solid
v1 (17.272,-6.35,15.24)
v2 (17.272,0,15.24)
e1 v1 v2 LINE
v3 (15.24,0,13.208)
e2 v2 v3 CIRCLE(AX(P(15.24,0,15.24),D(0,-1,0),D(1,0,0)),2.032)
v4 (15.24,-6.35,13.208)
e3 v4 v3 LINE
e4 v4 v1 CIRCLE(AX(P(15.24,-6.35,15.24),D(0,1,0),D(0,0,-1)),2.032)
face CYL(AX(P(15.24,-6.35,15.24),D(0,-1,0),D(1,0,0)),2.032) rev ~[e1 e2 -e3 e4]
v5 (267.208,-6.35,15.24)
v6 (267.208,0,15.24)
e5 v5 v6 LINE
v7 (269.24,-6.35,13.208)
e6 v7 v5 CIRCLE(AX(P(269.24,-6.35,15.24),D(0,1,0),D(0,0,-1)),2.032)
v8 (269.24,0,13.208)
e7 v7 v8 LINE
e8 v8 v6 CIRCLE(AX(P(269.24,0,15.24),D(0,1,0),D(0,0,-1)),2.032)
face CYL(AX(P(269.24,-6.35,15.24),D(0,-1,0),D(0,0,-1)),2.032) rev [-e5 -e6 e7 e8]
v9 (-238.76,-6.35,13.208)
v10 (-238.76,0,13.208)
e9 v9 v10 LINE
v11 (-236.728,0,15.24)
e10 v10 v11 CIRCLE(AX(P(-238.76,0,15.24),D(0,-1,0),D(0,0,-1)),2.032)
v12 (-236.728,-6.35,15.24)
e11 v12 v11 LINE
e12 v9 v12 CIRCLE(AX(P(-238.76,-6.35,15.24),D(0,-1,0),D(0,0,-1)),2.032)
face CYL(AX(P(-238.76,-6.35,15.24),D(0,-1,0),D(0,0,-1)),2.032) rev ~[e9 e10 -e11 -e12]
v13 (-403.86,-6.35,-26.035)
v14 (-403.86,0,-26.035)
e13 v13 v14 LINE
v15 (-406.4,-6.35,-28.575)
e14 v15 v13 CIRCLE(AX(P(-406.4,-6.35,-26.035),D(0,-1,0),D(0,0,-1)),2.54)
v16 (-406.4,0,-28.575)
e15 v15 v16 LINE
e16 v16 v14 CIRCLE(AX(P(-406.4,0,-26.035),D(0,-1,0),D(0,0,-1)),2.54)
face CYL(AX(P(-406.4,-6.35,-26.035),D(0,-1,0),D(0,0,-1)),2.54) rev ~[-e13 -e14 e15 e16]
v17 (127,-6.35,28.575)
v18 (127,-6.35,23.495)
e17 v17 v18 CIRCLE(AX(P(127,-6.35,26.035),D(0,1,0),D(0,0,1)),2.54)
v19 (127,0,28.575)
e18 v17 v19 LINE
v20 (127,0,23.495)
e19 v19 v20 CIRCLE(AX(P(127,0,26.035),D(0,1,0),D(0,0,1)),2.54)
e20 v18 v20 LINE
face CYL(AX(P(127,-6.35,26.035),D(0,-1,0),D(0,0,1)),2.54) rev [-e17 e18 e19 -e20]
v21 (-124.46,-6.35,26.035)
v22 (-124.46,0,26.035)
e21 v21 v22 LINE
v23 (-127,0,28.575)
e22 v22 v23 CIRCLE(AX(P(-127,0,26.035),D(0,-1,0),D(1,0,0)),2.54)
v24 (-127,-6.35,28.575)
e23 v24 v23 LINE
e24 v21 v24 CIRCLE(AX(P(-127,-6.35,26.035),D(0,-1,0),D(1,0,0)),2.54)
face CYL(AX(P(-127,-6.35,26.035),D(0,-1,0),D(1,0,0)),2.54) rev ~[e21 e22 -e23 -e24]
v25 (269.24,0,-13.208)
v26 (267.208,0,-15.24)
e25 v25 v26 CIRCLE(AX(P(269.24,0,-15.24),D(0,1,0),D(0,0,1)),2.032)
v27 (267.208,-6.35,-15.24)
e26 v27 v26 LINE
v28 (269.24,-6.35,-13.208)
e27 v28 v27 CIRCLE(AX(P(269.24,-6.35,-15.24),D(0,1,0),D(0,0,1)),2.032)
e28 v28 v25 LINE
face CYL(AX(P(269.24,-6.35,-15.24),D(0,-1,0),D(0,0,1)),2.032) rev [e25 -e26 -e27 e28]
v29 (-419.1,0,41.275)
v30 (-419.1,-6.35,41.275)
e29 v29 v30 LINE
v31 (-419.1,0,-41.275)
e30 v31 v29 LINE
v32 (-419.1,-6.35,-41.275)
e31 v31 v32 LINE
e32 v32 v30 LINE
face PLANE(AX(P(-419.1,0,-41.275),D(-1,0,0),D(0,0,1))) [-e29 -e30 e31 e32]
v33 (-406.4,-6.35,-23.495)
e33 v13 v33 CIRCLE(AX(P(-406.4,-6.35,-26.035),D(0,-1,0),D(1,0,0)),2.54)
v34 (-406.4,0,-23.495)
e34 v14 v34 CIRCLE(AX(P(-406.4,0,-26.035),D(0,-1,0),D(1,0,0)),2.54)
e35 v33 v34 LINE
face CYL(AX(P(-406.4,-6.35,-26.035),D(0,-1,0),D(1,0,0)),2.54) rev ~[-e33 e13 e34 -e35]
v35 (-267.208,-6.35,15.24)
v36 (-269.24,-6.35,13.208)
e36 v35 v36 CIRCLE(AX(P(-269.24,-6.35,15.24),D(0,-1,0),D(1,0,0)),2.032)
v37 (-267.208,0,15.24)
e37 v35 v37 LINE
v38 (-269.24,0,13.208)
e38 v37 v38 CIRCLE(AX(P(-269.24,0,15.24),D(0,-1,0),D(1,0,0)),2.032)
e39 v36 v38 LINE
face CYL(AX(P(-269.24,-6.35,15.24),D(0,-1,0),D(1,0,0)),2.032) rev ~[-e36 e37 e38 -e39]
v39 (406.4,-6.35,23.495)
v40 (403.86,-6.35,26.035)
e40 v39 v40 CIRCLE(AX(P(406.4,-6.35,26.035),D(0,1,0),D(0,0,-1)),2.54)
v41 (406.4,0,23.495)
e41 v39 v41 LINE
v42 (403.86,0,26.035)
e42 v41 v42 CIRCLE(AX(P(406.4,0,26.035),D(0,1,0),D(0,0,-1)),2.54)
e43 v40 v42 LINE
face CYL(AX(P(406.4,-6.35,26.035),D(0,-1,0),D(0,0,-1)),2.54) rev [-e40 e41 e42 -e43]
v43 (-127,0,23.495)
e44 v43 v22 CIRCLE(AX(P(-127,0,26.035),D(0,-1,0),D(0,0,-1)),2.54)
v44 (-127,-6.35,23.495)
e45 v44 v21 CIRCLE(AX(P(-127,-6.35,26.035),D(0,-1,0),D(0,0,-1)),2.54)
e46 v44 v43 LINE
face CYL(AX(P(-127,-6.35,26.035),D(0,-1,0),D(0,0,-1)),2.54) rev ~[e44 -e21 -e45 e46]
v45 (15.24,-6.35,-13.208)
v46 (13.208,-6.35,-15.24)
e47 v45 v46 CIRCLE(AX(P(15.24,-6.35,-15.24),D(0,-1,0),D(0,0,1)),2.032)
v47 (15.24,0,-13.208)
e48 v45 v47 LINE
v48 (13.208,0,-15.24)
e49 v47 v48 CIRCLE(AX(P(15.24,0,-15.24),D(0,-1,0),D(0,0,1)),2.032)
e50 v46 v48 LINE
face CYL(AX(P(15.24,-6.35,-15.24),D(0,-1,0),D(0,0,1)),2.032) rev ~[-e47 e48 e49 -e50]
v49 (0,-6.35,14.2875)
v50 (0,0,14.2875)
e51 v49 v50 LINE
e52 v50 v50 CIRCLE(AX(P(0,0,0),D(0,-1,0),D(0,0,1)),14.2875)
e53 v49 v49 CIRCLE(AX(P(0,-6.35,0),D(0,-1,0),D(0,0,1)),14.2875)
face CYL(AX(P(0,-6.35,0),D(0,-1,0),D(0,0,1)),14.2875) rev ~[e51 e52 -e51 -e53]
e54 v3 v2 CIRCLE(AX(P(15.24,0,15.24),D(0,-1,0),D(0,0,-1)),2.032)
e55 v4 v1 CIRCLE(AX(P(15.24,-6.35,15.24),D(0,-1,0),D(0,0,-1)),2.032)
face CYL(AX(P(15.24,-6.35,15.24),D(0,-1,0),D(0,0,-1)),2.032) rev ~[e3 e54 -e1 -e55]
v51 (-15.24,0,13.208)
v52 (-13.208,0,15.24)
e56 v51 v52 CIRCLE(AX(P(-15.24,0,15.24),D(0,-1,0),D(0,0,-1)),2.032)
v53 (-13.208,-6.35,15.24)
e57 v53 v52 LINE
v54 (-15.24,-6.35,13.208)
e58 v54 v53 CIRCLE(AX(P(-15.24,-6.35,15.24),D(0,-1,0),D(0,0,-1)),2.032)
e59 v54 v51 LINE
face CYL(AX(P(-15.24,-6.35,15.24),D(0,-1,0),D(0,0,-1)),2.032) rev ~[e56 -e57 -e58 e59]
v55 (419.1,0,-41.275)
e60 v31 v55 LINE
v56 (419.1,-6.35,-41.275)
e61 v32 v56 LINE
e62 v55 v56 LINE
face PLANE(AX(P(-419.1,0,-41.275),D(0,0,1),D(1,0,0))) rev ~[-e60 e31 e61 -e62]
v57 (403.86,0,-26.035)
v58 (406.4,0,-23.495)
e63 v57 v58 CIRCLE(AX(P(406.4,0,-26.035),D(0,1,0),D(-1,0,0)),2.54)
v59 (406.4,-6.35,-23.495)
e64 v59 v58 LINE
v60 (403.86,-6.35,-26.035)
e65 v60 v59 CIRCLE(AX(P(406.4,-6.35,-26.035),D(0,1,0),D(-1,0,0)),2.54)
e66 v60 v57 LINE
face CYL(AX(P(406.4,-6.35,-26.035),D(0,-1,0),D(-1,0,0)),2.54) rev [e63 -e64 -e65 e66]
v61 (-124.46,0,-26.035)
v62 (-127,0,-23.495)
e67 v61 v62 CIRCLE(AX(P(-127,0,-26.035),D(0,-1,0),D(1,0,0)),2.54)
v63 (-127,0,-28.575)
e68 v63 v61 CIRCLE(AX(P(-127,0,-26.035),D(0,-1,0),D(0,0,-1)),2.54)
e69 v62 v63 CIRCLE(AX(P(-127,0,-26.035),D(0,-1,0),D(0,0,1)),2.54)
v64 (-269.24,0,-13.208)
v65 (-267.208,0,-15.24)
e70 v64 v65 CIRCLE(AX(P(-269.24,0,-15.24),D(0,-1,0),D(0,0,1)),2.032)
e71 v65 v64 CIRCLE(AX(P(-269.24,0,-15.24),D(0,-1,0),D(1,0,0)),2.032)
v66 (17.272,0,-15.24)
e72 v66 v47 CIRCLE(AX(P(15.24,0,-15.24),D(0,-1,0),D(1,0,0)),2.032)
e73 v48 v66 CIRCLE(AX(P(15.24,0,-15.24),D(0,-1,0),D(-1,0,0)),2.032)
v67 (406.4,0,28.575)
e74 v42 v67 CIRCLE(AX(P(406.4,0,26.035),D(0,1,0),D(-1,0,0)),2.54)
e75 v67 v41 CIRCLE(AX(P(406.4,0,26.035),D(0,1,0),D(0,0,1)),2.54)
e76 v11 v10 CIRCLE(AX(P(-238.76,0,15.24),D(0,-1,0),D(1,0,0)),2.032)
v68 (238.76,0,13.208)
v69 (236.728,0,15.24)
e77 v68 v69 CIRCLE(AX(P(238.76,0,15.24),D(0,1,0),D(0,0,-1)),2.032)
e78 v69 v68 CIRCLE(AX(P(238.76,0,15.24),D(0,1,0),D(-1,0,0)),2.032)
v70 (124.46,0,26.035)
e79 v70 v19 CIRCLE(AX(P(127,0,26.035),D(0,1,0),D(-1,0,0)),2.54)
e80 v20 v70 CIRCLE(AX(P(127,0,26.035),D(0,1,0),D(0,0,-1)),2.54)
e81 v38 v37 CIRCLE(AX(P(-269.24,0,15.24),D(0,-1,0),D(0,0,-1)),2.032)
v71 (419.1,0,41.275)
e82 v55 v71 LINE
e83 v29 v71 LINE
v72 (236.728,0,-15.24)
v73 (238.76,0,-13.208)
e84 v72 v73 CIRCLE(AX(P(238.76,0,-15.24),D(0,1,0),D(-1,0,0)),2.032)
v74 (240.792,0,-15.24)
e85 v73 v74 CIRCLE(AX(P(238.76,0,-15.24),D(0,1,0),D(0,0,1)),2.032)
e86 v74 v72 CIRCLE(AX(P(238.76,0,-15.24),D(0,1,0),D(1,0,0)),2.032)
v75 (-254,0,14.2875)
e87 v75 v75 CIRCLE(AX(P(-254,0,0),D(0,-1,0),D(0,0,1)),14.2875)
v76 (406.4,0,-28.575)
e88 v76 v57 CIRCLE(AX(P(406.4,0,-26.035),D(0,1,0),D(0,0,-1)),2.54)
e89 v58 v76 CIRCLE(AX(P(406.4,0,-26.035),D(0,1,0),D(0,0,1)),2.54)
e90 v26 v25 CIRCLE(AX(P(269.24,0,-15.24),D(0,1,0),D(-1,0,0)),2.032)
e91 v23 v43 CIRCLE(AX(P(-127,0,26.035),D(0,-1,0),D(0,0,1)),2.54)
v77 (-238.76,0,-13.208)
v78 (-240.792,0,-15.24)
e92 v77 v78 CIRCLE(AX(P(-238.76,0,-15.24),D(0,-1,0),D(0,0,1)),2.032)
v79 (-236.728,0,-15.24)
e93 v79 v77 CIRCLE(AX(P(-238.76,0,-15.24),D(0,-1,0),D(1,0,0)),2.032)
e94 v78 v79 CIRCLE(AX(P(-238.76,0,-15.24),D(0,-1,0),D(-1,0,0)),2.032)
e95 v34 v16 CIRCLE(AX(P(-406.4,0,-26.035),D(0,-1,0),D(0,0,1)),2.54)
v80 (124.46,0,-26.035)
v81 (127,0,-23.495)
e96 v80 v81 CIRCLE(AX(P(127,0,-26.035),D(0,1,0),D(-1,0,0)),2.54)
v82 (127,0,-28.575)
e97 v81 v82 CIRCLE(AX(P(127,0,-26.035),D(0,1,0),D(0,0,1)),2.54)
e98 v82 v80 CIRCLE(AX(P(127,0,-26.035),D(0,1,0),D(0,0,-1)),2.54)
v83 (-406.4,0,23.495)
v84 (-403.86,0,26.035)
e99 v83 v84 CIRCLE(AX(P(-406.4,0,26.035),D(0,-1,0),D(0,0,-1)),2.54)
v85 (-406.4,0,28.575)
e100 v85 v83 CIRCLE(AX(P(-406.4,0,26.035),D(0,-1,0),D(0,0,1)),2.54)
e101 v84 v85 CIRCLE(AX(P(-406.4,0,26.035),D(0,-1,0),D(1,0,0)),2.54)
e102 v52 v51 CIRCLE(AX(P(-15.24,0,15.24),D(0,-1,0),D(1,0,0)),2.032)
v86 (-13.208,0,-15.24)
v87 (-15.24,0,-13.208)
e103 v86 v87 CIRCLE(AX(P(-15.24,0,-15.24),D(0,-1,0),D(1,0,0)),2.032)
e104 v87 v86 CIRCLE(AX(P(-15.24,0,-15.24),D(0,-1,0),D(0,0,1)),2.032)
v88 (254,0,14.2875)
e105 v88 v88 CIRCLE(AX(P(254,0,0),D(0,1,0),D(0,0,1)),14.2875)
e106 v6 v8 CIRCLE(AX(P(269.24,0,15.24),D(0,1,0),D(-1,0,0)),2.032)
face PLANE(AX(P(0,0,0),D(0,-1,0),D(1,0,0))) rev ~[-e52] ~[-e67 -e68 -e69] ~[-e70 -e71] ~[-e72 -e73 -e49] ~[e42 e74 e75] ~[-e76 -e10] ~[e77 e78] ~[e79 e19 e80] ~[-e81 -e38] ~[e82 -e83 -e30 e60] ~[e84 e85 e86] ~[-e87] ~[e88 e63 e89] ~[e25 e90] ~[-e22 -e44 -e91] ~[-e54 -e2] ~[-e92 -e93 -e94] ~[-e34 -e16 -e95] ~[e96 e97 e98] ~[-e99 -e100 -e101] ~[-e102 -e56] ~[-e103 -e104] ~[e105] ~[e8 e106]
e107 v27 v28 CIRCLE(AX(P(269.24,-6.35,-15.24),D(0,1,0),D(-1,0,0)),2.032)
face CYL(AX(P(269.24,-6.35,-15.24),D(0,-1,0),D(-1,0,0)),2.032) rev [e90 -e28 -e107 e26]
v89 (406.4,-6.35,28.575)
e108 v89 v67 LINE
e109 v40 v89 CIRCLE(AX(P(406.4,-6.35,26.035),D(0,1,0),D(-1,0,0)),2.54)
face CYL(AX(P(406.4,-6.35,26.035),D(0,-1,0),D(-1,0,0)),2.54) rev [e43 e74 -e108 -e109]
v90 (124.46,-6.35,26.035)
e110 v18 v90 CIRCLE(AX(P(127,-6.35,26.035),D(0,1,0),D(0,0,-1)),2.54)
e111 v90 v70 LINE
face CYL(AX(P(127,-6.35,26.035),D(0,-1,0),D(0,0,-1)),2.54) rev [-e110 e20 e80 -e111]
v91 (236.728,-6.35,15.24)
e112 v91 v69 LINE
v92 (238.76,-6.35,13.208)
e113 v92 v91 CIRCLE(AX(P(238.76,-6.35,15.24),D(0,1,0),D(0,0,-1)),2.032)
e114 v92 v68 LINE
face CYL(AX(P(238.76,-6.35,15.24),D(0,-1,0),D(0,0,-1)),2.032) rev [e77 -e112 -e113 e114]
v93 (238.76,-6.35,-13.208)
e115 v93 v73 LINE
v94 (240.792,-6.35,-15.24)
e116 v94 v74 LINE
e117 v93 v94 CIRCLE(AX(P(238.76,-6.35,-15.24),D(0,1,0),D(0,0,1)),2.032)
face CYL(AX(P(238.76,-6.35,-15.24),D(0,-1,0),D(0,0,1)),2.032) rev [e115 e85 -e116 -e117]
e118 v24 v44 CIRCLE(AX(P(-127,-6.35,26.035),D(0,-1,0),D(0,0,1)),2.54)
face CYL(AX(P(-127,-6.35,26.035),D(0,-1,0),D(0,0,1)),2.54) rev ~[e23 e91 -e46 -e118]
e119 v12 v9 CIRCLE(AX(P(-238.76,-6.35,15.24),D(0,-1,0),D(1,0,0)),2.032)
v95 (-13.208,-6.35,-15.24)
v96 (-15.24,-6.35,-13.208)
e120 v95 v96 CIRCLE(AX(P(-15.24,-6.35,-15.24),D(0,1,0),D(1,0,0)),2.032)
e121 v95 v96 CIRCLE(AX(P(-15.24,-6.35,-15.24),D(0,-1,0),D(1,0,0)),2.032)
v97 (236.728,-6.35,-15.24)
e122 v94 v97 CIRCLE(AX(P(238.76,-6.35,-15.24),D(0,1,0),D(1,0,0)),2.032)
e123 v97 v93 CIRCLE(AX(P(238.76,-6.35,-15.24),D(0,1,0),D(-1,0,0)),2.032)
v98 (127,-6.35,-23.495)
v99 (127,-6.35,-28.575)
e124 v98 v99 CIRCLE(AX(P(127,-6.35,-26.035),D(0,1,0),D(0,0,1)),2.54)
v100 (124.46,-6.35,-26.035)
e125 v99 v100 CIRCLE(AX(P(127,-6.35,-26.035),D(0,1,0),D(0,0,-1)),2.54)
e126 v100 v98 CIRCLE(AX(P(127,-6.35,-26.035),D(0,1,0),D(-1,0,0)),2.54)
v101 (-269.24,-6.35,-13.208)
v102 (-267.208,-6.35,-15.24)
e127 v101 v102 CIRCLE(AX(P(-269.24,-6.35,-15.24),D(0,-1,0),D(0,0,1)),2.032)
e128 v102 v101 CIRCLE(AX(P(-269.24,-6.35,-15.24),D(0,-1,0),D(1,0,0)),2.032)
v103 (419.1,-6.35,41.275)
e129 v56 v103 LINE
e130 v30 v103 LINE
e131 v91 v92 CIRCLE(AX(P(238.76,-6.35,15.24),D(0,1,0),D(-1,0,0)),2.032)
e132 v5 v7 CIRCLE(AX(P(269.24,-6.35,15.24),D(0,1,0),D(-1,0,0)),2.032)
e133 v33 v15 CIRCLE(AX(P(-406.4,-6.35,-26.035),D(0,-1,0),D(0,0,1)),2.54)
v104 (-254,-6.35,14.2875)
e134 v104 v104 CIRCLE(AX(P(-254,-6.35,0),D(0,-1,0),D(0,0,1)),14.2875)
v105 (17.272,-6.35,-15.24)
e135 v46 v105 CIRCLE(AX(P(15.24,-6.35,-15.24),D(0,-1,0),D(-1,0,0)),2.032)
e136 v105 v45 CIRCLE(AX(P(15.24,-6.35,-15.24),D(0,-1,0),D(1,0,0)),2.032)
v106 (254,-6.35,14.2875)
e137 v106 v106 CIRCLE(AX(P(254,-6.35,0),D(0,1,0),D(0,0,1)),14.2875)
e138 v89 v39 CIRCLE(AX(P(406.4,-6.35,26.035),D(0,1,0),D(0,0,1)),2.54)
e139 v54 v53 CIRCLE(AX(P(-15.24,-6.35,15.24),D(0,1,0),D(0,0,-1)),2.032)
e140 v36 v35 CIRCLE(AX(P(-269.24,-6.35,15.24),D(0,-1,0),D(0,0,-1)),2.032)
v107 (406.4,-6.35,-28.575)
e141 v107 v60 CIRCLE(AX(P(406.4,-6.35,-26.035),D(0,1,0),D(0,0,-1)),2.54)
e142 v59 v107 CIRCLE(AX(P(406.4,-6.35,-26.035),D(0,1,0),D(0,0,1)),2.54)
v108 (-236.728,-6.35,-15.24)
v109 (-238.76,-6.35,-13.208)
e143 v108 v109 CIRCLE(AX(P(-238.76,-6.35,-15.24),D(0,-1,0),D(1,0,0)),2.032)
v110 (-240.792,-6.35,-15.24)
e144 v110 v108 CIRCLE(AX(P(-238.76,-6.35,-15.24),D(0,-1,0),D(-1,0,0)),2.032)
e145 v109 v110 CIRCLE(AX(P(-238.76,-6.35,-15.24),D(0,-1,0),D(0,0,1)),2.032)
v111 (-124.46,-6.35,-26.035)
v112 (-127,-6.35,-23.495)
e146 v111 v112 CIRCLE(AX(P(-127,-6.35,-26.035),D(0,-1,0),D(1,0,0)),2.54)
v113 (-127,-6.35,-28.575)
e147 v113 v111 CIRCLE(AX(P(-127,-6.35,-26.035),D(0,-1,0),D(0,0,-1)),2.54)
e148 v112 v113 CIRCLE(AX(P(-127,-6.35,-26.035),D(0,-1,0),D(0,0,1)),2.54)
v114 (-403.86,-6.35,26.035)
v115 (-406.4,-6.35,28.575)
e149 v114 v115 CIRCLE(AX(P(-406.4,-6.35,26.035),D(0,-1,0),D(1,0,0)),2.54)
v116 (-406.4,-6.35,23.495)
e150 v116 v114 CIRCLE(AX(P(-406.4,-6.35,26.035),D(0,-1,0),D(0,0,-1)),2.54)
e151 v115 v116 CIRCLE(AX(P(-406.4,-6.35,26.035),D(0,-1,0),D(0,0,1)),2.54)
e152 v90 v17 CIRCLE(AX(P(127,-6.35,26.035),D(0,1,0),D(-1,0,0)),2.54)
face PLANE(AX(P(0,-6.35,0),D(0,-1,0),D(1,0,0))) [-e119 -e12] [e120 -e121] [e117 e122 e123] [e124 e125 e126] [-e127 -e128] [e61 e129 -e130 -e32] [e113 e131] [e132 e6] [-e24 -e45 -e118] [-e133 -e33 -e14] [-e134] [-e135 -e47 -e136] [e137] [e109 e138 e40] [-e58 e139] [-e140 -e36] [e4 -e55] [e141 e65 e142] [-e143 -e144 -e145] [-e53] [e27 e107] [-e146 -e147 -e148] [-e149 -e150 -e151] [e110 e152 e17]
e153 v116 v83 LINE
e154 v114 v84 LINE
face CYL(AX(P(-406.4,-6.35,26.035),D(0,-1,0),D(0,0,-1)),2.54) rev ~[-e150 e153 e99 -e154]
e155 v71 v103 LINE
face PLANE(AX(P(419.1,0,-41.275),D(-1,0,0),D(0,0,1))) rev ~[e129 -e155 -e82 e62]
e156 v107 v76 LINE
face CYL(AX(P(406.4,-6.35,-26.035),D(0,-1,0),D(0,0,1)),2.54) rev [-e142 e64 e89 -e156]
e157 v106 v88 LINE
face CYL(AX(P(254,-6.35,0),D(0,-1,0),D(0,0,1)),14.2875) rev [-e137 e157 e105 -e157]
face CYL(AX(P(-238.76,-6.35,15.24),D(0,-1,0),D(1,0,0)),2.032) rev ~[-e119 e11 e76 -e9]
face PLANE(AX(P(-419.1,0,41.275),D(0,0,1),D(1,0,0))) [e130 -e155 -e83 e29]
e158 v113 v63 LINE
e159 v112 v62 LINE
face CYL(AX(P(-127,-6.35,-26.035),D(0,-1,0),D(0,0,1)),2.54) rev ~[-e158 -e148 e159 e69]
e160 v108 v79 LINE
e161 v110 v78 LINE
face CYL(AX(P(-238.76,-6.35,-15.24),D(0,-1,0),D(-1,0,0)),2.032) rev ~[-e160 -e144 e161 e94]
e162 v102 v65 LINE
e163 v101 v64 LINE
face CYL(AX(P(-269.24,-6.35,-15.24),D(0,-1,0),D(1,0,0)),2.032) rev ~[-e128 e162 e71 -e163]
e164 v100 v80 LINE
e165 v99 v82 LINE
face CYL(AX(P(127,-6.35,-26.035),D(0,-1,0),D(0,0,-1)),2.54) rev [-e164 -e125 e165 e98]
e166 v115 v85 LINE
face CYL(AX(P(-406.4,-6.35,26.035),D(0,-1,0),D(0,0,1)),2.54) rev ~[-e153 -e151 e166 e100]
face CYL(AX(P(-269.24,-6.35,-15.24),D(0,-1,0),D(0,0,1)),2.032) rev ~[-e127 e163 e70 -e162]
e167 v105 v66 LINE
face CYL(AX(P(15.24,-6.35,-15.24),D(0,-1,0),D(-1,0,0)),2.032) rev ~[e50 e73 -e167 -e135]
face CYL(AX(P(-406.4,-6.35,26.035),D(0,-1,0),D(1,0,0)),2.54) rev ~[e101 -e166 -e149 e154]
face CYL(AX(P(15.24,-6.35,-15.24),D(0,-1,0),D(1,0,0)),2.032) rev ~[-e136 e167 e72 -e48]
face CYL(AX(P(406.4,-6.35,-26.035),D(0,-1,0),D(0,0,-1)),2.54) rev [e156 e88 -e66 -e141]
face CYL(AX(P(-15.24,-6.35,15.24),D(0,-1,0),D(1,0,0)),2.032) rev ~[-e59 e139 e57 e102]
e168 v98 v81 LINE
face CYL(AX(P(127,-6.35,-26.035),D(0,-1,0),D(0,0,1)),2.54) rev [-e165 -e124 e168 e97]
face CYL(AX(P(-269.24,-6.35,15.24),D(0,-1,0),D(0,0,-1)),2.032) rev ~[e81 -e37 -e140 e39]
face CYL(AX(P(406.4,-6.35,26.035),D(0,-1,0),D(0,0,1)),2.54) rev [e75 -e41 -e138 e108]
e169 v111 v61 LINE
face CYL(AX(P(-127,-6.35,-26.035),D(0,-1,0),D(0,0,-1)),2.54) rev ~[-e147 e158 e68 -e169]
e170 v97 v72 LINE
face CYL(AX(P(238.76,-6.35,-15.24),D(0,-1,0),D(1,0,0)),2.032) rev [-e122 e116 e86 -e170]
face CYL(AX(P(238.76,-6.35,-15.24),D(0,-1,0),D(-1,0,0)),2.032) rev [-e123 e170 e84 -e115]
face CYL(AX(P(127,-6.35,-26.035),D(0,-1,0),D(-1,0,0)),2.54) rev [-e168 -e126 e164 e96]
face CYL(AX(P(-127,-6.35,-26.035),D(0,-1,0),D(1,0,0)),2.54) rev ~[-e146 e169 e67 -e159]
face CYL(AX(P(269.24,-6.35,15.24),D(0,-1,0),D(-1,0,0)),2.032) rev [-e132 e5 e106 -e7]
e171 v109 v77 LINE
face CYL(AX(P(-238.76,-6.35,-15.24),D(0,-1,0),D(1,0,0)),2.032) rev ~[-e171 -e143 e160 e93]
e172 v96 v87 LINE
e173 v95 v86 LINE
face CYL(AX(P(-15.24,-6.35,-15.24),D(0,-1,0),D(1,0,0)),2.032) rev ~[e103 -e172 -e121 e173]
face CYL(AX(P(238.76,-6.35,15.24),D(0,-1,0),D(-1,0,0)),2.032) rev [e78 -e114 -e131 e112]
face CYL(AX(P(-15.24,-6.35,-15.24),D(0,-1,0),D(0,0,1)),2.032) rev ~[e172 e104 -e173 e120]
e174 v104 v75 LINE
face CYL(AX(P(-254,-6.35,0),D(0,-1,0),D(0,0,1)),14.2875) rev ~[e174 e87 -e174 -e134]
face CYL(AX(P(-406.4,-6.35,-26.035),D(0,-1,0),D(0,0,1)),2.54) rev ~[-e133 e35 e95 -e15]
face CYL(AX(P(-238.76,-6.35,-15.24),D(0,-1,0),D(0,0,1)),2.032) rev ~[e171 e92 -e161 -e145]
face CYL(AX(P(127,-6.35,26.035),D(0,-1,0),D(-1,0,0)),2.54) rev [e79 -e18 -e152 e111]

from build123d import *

# Parameters (mm, degrees)
F0_W     = 838.2
F0_H     = 82.55
F1_DEPTH = 6.35
F3_DEPTH = 6.35
F5_DEPTH = 6.35


# Not quite as in the source:
# - a pattern or mirror of a feature is missing from the dataset's text; its kind, count and spacing are read off the source's solid


with BuildPart() as f1:
    # F0 (on Front) → F1 (new body)
    with BuildSketch(Plane.XZ):
        Rectangle(F0_W, F0_H)
    extrude(amount=F1_DEPTH)

    # F2 (on face) → F3 (cut, through all)
    with BuildSketch(Plane.XZ.offset(6.35)):
        with BuildLine():
            ThreePointArc((-267.208, 15.24), (-270.6768409794, 16.6768409794), (-269.24, 13.208))
            Line((-269.24, 13.208), (-269.24, 15.24))
            Line((-269.24, 15.24), (-267.208, 15.24))
        make_face()
        with BuildLine():
            Line((-269.24, 15.24), (-269.24, 13.208))
            ThreePointArc((-269.24, 13.208), (-267.8031590206, 13.8031590206), (-267.208, 15.24))
            Line((-267.208, 15.24), (-269.24, 15.24))
        make_face()
        with BuildLine():
            Line((-254, 0), (-268.2875, 0))
            ThreePointArc((-268.2875, 0), (-254, -14.2875), (-239.7125, 0))
            ThreePointArc((-239.7125, 0), (-243.8972118638, 10.1027881362), (-254, 14.2875))
            Line((-254, 14.2875), (-254, 0))
        make_face()
        with BuildLine():
            ThreePointArc((-254, 14.2875), (-264.1027881362, 10.1027881362), (-268.2875, 0))
            Line((-268.2875, 0), (-254, 0))
            Line((-254, 0), (-254, 14.2875))
        make_face()
        with BuildLine():
            Line((-269.24, -15.24), (-269.24, -13.208))
            ThreePointArc((-269.24, -13.208), (-270.6768409794, -16.6768409794), (-267.208, -15.24))
            Line((-267.208, -15.24), (-269.24, -15.24))
        make_face()
        with BuildLine():
            ThreePointArc((-267.208, -15.24), (-267.8031590206, -13.8031590206), (-269.24, -13.208))
            Line((-269.24, -13.208), (-269.24, -15.24))
            Line((-269.24, -15.24), (-267.208, -15.24))
        make_face()
        with BuildLine():
            Line((-238.76, -15.24), (-240.792, -15.24))
            ThreePointArc((-240.792, -15.24), (-238.76, -17.272), (-236.728, -15.24))
            ThreePointArc((-236.728, -15.24), (-237.3231590206, -13.8031590206), (-238.76, -13.208))
            Line((-238.76, -13.208), (-238.76, -15.24))
        make_face()
        with BuildLine():
            ThreePointArc((-238.76, -13.208), (-240.1968409794, -13.8031590206), (-240.792, -15.24))
            Line((-240.792, -15.24), (-238.76, -15.24))
            Line((-238.76, -15.24), (-238.76, -13.208))
        make_face()
        with BuildLine():
            ThreePointArc((-236.728, 15.24), (-240.1968409794, 16.6768409794), (-238.76, 13.208))
            ThreePointArc((-238.76, 13.208), (-237.3231590206, 13.8031590206), (-236.728, 15.24))
        make_face()
        with BuildLine():
            ThreePointArc((14.2875, 0), (10.1027881362, 10.1027881362), (0, 14.2875))
            ThreePointArc((0, 14.2875), (-10.1027881362, -10.1027881362), (14.2875, 0))
        make_face()
        with BuildLine():
            Line((15.24, -15.24), (13.208, -15.24))
            ThreePointArc((13.208, -15.24), (15.24, -17.272), (17.272, -15.24))
            ThreePointArc((17.272, -15.24), (16.6768409794, -13.8031590206), (15.24, -13.208))
            Line((15.24, -13.208), (15.24, -15.24))
        make_face()
        with BuildLine():
            ThreePointArc((15.24, -13.208), (13.8031590206, -13.8031590206), (13.208, -15.24))
            Line((13.208, -15.24), (15.24, -15.24))
            Line((15.24, -15.24), (15.24, -13.208))
        make_face()
        with BuildLine():
            ThreePointArc((17.272, 15.24), (13.8031590206, 16.6768409794), (15.24, 13.208))
            ThreePointArc((15.24, 13.208), (16.6768409794, 13.8031590206), (17.272, 15.24))
        make_face()
        with BuildLine():
            Line((-15.24, 15.24), (-13.208, 15.24))
            ThreePointArc((-13.208, 15.24), (-16.6768409794, 16.6768409794), (-15.24, 13.208))
            Line((-15.24, 13.208), (-15.24, 15.24))
        make_face()
        with BuildLine():
            ThreePointArc((-15.24, 13.208), (-13.8031590206, 13.8031590206), (-13.208, 15.24))
            Line((-13.208, 15.24), (-15.24, 15.24))
            Line((-15.24, 15.24), (-15.24, 13.208))
        make_face()
        with BuildLine():
            Line((-15.24, -15.24), (-15.24, -13.208))
            ThreePointArc((-15.24, -13.208), (-16.6768409794, -16.6768409794), (-13.208, -15.24))
            Line((-13.208, -15.24), (-15.24, -15.24))
        make_face()
        with BuildLine():
            ThreePointArc((-13.208, -15.24), (-13.8031590206, -13.8031590206), (-15.24, -13.208))
            Line((-15.24, -13.208), (-15.24, -15.24))
            Line((-15.24, -15.24), (-13.208, -15.24))
        make_face()
    f3 = extrude(amount=-F3_DEPTH, mode=Mode.SUBTRACT)

    # F3_copies: F3 across plane
    add(f3.mirror(Plane(origin=(0, 0, 0), x_dir=(0, 0, 1), z_dir=(1, 0, 0))), mode=Mode.SUBTRACT)

    # F4 (on face) → F5 (cut, through all)
    with BuildSketch(Plane.XZ.offset(6.35)):
        with BuildLine():
            ThreePointArc((-403.86, 26.035), (-404.6039487758, 27.8310512242), (-406.4, 28.575))
            Line((-406.4, 28.575), (-406.4, 23.495))
            ThreePointArc((-406.4, 23.495), (-404.6039487758, 24.2389487758), (-403.86, 26.035))
        make_face()
        with BuildLine():
            ThreePointArc((-403.86, -26.035), (-404.6039487758, -24.2389487758), (-406.4, -23.495))
            Line((-406.4, -23.495), (-406.4, -28.575))
            ThreePointArc((-406.4, -28.575), (-404.6039487758, -27.8310512242), (-403.86, -26.035))
        make_face()
        with BuildLine():
            Line((-406.4, -28.575), (-406.4, -23.495))
            ThreePointArc((-406.4, -23.495), (-408.94, -26.035), (-406.4, -28.575))
        make_face()
        with BuildLine():
            Line((-406.4, 23.495), (-406.4, 28.575))
            ThreePointArc((-406.4, 28.575), (-408.94, 26.035), (-406.4, 23.495))
        make_face()
        with BuildLine():
            ThreePointArc((-124.46, 26.035), (-125.2039487758, 27.8310512242), (-127, 28.575))
            Line((-127, 28.575), (-127, 23.495))
            ThreePointArc((-127, 23.495), (-125.2039487758, 24.2389487758), (-124.46, 26.035))
        make_face()
        with BuildLine():
            ThreePointArc((-124.46, -26.035), (-125.2039487758, -24.2389487758), (-127, -23.495))
            Line((-127, -23.495), (-127, -28.575))
            ThreePointArc((-127, -28.575), (-125.2039487758, -27.8310512242), (-124.46, -26.035))
        make_face()
        with BuildLine():
            Line((-127, -28.575), (-127, -23.495))
            ThreePointArc((-127, -23.495), (-129.54, -26.035), (-127, -28.575))
        make_face()
        with BuildLine():
            Line((-127, 23.495), (-127, 28.575))
            ThreePointArc((-127, 28.575), (-129.54, 26.035), (-127, 23.495))
        make_face()
    f5 = extrude(amount=-F5_DEPTH, mode=Mode.SUBTRACT)

    # F5_copies: F5 across plane
    add(f5.mirror(Plane(origin=(0, 0, 0), x_dir=(0, 0, 1), z_dir=(1, 0, 0))), mode=Mode.SUBTRACT)


solid = f1.part
